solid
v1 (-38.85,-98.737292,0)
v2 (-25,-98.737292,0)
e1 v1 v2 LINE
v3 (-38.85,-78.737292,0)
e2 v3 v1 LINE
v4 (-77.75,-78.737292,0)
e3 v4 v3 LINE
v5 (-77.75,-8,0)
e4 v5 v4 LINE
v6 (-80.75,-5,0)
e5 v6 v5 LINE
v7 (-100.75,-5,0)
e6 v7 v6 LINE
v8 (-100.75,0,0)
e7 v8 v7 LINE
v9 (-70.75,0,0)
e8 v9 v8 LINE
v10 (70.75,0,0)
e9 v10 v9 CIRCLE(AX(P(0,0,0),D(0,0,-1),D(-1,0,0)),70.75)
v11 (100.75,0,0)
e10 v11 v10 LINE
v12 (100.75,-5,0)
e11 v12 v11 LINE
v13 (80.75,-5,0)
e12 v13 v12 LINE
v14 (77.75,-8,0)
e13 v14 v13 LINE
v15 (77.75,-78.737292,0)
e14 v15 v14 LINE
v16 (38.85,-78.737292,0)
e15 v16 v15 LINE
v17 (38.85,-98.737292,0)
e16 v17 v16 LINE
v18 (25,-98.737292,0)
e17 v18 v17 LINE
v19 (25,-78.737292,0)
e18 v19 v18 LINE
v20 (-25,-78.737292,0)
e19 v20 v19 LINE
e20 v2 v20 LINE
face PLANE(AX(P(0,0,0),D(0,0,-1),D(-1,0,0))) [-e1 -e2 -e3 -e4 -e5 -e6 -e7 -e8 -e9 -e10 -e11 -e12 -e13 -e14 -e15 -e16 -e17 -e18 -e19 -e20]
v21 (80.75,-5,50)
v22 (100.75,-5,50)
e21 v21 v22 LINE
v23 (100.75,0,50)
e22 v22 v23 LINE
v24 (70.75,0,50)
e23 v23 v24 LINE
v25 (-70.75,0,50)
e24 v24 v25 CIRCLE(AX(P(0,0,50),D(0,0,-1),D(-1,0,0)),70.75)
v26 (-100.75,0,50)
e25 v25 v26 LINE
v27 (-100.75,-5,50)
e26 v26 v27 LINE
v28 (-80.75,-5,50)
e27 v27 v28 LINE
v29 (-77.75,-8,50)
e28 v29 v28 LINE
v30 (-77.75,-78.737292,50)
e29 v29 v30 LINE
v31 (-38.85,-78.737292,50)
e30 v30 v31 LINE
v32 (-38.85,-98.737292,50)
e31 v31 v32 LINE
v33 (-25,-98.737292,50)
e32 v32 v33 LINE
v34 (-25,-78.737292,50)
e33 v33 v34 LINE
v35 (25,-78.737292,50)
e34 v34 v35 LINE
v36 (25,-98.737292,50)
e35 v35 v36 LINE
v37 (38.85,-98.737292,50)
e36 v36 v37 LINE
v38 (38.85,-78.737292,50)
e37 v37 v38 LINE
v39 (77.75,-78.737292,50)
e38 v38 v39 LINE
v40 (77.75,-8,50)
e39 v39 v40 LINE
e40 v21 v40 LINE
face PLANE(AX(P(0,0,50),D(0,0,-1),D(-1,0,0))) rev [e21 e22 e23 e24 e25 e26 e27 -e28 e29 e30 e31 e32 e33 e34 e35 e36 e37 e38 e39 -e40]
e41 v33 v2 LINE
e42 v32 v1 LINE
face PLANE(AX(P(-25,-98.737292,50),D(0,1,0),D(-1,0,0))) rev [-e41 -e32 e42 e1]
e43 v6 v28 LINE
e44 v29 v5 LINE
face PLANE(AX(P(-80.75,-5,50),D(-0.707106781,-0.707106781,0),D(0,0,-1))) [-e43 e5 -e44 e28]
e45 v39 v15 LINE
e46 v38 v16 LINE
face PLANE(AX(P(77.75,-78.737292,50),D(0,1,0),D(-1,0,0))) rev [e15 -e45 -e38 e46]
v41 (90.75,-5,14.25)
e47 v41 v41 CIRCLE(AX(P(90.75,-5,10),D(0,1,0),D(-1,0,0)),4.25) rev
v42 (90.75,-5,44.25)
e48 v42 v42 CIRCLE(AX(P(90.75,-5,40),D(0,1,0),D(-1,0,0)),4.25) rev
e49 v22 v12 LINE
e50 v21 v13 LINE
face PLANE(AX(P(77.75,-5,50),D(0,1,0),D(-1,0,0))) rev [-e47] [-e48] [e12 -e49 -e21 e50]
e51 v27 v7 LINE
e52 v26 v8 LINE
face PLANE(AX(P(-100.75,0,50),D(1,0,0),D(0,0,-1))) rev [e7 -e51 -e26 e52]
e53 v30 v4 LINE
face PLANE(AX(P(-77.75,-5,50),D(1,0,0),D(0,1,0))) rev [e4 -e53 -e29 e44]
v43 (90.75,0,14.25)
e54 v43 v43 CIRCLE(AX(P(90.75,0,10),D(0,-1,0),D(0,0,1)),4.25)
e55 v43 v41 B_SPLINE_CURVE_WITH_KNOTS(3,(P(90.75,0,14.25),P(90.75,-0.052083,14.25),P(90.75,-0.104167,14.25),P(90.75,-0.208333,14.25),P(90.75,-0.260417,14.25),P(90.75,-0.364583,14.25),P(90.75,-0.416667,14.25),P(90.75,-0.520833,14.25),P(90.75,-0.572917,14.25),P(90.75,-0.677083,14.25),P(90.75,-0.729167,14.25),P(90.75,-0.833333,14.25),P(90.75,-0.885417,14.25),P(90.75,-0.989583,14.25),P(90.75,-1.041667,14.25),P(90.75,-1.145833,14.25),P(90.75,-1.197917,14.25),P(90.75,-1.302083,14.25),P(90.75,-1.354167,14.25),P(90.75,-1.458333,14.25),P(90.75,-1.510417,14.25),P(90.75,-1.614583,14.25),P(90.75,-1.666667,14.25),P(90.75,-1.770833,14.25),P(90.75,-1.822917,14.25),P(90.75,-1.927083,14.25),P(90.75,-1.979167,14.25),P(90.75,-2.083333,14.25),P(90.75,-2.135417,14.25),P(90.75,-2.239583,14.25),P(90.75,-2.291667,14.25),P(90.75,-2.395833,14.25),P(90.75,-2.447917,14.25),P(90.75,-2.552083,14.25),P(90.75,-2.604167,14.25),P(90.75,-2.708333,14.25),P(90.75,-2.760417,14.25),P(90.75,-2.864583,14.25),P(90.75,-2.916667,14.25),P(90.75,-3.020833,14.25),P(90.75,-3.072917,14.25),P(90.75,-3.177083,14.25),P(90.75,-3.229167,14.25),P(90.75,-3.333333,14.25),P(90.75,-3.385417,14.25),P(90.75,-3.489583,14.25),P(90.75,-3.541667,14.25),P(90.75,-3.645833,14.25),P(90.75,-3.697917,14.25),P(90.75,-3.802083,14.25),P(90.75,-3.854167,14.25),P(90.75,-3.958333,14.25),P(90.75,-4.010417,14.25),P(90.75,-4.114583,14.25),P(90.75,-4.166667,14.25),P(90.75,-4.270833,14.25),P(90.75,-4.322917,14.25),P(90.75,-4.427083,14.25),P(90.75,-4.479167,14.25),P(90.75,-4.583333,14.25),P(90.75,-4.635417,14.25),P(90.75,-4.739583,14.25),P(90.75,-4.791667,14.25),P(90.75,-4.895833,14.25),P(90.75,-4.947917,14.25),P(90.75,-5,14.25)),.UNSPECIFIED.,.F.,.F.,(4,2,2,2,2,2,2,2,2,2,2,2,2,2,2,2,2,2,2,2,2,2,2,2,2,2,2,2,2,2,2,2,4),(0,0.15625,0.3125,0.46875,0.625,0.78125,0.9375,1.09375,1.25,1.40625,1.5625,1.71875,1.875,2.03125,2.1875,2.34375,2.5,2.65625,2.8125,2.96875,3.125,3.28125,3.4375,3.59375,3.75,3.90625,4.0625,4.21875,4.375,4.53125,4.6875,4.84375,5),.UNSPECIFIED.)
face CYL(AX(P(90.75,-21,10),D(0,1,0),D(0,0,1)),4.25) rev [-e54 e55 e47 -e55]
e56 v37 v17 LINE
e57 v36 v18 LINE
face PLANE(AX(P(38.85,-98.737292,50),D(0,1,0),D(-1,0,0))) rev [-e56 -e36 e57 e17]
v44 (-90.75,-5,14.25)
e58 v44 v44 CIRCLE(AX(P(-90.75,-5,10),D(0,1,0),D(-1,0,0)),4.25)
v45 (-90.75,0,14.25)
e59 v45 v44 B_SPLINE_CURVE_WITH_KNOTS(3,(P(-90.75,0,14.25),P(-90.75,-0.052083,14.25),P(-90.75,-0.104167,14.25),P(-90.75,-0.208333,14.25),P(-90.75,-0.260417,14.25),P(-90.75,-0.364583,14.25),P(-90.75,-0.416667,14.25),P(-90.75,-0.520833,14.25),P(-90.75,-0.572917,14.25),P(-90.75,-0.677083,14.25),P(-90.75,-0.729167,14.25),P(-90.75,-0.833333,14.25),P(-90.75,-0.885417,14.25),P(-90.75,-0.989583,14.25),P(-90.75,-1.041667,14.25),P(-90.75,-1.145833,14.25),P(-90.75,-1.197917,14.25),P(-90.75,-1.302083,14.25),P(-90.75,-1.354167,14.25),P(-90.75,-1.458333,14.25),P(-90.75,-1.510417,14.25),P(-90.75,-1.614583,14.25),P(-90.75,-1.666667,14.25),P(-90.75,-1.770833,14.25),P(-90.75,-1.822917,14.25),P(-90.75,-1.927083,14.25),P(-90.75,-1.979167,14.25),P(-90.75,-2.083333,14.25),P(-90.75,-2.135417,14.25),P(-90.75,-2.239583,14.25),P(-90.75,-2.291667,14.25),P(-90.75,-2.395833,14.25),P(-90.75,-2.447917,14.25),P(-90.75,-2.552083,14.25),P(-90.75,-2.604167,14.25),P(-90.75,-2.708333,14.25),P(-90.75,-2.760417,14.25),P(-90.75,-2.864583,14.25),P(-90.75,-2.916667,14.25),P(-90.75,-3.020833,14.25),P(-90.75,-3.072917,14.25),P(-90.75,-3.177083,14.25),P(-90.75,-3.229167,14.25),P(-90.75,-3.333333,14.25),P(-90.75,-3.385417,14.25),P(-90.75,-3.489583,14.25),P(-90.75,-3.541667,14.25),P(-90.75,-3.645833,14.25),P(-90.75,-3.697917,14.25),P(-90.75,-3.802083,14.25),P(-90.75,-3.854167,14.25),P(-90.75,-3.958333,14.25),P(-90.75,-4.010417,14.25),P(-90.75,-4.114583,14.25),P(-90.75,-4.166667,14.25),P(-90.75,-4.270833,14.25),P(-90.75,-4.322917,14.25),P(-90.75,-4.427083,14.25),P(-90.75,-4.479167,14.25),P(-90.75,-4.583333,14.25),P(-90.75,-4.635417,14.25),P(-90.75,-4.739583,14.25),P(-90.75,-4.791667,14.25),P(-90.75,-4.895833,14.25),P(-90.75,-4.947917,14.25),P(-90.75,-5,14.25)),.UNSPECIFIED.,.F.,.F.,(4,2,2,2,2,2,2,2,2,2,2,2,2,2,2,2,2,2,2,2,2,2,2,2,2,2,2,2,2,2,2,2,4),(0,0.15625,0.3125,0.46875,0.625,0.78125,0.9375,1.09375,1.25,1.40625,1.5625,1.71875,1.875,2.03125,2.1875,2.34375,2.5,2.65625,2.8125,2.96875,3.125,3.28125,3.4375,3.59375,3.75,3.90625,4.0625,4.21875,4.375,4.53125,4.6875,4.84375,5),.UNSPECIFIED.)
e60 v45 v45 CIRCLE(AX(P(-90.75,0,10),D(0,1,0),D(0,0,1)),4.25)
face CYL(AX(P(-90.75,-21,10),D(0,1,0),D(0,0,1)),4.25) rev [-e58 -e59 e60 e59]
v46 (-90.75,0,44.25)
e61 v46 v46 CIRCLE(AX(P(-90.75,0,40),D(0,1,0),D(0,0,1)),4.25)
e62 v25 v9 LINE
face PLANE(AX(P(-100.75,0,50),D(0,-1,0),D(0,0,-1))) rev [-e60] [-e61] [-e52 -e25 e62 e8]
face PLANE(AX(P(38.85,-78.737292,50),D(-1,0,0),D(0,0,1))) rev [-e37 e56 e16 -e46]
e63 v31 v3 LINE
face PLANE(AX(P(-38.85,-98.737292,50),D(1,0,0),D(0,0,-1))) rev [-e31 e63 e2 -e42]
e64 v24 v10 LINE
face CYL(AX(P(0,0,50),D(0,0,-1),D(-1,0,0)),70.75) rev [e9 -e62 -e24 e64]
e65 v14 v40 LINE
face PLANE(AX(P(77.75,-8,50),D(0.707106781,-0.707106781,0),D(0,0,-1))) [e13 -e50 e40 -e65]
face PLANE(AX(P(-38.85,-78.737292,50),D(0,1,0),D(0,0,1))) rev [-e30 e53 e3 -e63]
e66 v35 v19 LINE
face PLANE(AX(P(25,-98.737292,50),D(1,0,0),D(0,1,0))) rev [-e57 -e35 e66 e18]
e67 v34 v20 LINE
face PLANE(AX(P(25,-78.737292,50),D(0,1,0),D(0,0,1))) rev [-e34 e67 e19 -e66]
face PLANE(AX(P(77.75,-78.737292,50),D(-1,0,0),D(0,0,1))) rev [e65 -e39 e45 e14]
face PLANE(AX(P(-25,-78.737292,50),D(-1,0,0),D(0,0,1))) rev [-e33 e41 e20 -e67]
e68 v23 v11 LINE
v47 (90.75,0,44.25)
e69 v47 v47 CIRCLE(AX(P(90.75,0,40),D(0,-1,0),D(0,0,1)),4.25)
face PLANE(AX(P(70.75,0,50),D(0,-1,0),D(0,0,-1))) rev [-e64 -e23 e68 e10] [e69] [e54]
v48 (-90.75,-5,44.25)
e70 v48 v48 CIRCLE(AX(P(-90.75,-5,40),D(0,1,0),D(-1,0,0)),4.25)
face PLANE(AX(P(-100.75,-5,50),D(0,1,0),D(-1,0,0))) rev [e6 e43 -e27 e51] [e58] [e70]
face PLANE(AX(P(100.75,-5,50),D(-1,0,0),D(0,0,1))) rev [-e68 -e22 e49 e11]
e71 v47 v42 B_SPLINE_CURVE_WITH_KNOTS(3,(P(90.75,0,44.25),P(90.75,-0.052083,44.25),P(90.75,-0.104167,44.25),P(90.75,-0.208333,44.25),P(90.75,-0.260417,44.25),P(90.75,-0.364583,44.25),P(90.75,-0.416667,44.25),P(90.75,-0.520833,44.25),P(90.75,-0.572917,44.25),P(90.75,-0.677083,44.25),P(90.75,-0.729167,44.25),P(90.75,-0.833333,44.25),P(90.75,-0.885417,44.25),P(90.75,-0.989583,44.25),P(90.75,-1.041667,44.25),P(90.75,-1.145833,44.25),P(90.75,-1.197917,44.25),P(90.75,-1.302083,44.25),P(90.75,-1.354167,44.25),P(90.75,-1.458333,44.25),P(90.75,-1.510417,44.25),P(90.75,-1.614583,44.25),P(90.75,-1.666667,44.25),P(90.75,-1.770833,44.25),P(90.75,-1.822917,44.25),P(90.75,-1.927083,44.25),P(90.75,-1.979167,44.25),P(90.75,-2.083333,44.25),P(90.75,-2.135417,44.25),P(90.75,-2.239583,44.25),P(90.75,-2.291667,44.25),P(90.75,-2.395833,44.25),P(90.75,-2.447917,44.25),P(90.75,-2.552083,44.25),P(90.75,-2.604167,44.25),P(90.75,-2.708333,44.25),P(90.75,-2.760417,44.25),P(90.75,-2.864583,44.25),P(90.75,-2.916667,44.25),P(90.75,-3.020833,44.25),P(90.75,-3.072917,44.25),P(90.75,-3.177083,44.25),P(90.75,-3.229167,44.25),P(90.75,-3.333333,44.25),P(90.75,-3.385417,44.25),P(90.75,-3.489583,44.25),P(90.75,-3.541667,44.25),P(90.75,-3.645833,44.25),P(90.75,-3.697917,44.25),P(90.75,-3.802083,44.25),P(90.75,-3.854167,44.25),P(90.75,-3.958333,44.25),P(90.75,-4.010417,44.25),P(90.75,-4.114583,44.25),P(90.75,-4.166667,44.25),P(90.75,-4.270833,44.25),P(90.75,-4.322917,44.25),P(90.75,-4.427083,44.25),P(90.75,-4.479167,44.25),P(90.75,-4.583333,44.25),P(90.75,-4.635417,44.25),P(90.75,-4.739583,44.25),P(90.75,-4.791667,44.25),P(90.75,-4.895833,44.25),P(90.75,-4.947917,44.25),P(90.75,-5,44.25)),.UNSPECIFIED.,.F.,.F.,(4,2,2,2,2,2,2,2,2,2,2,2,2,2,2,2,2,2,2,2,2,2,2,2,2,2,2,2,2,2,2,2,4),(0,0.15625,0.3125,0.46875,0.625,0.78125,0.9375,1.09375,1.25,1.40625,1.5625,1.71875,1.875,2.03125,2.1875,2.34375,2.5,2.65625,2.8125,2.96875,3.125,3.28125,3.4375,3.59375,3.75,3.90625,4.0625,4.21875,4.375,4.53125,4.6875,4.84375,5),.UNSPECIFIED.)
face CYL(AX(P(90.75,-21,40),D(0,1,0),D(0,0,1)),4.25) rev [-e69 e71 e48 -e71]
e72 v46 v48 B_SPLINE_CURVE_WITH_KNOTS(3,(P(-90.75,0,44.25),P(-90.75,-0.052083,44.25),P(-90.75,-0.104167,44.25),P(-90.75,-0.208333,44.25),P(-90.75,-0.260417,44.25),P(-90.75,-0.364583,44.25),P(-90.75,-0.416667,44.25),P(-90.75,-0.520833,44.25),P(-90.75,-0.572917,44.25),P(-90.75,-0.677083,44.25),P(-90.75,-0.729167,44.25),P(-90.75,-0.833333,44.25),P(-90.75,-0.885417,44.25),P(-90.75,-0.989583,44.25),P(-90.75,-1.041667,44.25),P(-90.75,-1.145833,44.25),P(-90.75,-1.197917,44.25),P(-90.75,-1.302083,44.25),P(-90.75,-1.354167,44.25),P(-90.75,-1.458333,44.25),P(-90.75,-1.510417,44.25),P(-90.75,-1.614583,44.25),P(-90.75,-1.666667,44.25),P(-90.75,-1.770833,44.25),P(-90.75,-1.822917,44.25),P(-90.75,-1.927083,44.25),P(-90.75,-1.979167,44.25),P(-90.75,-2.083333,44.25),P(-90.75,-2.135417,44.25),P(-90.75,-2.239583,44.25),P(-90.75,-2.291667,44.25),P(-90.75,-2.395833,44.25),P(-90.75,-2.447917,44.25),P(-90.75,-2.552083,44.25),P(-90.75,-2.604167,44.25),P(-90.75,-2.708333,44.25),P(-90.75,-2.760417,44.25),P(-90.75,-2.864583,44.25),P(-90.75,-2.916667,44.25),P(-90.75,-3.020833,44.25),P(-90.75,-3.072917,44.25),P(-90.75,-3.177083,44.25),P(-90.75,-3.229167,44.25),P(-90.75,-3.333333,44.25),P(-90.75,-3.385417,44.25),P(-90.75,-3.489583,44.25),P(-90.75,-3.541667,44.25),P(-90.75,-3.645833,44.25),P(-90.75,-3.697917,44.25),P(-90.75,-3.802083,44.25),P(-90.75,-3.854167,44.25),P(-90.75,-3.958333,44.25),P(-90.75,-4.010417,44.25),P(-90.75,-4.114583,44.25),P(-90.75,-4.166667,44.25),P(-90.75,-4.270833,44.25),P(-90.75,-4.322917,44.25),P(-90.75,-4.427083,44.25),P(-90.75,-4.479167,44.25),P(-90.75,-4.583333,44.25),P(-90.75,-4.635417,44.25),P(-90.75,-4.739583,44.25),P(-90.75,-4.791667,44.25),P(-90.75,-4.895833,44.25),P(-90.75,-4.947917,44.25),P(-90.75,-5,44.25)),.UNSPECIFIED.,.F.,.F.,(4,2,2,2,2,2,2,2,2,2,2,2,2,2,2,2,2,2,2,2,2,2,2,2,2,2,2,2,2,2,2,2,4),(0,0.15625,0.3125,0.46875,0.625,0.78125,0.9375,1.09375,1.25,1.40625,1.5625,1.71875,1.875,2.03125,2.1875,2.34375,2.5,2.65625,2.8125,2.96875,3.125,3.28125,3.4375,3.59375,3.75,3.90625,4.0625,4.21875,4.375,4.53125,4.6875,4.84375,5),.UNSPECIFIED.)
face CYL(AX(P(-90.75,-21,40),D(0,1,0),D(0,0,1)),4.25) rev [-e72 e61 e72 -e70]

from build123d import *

# Parameters (mm, degrees)
DODANIE_WYCI_GNI_CIE1_DEPTH = 50
SZKIC2_R                    = 4.25
WYTNIJ_WYCI_GNI_CIE1_DEPTH  = 21
SFAZOWANIE1_SIZE            = 3
SFAZOWANIE2_SIZE            = 3


with BuildPart() as part:
    # Szkic1 → Dodanie-wyciągnięcie1 (new body)
    with BuildSketch(Plane.XY):
        with BuildLine():
            Line((70.75, 0), (100.75, 0))
            Line((100.75, 0), (100.75, -5))
            Line((100.75, -5), (77.75, -5))
            Line((77.75, -5), (77.75, -78.737292332))
            Line((77.75, -78.737292332), (38.85, -78.737292332))
            Line((38.85, -78.737292332), (38.85, -98.737292332))
            Line((38.85, -98.737292332), (25, -98.737292332))
            Line((25, -98.737292332), (25, -78.737292332))
            Line((25, -78.737292332), (-25, -78.737292332))
            Line((-25, -78.737292332), (-25, -98.737292332))
            Line((-25, -98.737292332), (-38.85, -98.737292332))
            Line((-38.85, -98.737292332), (-38.85, -78.737292332))
            Line((-38.85, -78.737292332), (-77.75, -78.737292332))
            Line((-77.75, -78.737292332), (-77.75, -5))
            Line((-77.75, -5), (-100.75, -5))
            Line((-100.75, -5), (-100.75, 0))
            Line((-100.75, 0), (-70.75, 0))
            ThreePointArc((-70.75, 0), (0, -70.75), (70.75, 0))
        make_face()
    extrude(amount=DODANIE_WYCI_GNI_CIE1_DEPTH)

    # Szkic2 → Wytnij-wyciągnięcie1 (cut)
    with BuildSketch(Plane(origin=(0, 0, 0), x_dir=(1, 0, 0), z_dir=(0, 1, 0))):
        with Locations((-90.75, -10)):
            Circle(SZKIC2_R)
        with Locations((-90.75, -40)):
            Circle(SZKIC2_R)
    wytnij_wyci_gni_cie1 = extrude(amount=-WYTNIJ_WYCI_GNI_CIE1_DEPTH, mode=Mode.SUBTRACT)

    # Lustro2: Wytnij-wyciągnięcie1 across plane
    add(wytnij_wyci_gni_cie1.mirror(Plane(origin=(0, 0, 0), x_dir=(0, 0, 1), z_dir=(1, 0, 0))), mode=Mode.SUBTRACT)

    # Sfazowanie1
    sfazowanie1_edges = [part.edges().sort_by_distance(p)[0] for p in [
        (-77.75, -5, 25),
    ]]
    chamfer(sfazowanie1_edges, length=SFAZOWANIE1_SIZE)

    # Sfazowanie2
    sfazowanie2_edges = [part.edges().sort_by_distance(p)[0] for p in [
        (77.75, -5, 25),
    ]]
    chamfer(sfazowanie2_edges, length=SFAZOWANIE2_SIZE)


solid = part.part
